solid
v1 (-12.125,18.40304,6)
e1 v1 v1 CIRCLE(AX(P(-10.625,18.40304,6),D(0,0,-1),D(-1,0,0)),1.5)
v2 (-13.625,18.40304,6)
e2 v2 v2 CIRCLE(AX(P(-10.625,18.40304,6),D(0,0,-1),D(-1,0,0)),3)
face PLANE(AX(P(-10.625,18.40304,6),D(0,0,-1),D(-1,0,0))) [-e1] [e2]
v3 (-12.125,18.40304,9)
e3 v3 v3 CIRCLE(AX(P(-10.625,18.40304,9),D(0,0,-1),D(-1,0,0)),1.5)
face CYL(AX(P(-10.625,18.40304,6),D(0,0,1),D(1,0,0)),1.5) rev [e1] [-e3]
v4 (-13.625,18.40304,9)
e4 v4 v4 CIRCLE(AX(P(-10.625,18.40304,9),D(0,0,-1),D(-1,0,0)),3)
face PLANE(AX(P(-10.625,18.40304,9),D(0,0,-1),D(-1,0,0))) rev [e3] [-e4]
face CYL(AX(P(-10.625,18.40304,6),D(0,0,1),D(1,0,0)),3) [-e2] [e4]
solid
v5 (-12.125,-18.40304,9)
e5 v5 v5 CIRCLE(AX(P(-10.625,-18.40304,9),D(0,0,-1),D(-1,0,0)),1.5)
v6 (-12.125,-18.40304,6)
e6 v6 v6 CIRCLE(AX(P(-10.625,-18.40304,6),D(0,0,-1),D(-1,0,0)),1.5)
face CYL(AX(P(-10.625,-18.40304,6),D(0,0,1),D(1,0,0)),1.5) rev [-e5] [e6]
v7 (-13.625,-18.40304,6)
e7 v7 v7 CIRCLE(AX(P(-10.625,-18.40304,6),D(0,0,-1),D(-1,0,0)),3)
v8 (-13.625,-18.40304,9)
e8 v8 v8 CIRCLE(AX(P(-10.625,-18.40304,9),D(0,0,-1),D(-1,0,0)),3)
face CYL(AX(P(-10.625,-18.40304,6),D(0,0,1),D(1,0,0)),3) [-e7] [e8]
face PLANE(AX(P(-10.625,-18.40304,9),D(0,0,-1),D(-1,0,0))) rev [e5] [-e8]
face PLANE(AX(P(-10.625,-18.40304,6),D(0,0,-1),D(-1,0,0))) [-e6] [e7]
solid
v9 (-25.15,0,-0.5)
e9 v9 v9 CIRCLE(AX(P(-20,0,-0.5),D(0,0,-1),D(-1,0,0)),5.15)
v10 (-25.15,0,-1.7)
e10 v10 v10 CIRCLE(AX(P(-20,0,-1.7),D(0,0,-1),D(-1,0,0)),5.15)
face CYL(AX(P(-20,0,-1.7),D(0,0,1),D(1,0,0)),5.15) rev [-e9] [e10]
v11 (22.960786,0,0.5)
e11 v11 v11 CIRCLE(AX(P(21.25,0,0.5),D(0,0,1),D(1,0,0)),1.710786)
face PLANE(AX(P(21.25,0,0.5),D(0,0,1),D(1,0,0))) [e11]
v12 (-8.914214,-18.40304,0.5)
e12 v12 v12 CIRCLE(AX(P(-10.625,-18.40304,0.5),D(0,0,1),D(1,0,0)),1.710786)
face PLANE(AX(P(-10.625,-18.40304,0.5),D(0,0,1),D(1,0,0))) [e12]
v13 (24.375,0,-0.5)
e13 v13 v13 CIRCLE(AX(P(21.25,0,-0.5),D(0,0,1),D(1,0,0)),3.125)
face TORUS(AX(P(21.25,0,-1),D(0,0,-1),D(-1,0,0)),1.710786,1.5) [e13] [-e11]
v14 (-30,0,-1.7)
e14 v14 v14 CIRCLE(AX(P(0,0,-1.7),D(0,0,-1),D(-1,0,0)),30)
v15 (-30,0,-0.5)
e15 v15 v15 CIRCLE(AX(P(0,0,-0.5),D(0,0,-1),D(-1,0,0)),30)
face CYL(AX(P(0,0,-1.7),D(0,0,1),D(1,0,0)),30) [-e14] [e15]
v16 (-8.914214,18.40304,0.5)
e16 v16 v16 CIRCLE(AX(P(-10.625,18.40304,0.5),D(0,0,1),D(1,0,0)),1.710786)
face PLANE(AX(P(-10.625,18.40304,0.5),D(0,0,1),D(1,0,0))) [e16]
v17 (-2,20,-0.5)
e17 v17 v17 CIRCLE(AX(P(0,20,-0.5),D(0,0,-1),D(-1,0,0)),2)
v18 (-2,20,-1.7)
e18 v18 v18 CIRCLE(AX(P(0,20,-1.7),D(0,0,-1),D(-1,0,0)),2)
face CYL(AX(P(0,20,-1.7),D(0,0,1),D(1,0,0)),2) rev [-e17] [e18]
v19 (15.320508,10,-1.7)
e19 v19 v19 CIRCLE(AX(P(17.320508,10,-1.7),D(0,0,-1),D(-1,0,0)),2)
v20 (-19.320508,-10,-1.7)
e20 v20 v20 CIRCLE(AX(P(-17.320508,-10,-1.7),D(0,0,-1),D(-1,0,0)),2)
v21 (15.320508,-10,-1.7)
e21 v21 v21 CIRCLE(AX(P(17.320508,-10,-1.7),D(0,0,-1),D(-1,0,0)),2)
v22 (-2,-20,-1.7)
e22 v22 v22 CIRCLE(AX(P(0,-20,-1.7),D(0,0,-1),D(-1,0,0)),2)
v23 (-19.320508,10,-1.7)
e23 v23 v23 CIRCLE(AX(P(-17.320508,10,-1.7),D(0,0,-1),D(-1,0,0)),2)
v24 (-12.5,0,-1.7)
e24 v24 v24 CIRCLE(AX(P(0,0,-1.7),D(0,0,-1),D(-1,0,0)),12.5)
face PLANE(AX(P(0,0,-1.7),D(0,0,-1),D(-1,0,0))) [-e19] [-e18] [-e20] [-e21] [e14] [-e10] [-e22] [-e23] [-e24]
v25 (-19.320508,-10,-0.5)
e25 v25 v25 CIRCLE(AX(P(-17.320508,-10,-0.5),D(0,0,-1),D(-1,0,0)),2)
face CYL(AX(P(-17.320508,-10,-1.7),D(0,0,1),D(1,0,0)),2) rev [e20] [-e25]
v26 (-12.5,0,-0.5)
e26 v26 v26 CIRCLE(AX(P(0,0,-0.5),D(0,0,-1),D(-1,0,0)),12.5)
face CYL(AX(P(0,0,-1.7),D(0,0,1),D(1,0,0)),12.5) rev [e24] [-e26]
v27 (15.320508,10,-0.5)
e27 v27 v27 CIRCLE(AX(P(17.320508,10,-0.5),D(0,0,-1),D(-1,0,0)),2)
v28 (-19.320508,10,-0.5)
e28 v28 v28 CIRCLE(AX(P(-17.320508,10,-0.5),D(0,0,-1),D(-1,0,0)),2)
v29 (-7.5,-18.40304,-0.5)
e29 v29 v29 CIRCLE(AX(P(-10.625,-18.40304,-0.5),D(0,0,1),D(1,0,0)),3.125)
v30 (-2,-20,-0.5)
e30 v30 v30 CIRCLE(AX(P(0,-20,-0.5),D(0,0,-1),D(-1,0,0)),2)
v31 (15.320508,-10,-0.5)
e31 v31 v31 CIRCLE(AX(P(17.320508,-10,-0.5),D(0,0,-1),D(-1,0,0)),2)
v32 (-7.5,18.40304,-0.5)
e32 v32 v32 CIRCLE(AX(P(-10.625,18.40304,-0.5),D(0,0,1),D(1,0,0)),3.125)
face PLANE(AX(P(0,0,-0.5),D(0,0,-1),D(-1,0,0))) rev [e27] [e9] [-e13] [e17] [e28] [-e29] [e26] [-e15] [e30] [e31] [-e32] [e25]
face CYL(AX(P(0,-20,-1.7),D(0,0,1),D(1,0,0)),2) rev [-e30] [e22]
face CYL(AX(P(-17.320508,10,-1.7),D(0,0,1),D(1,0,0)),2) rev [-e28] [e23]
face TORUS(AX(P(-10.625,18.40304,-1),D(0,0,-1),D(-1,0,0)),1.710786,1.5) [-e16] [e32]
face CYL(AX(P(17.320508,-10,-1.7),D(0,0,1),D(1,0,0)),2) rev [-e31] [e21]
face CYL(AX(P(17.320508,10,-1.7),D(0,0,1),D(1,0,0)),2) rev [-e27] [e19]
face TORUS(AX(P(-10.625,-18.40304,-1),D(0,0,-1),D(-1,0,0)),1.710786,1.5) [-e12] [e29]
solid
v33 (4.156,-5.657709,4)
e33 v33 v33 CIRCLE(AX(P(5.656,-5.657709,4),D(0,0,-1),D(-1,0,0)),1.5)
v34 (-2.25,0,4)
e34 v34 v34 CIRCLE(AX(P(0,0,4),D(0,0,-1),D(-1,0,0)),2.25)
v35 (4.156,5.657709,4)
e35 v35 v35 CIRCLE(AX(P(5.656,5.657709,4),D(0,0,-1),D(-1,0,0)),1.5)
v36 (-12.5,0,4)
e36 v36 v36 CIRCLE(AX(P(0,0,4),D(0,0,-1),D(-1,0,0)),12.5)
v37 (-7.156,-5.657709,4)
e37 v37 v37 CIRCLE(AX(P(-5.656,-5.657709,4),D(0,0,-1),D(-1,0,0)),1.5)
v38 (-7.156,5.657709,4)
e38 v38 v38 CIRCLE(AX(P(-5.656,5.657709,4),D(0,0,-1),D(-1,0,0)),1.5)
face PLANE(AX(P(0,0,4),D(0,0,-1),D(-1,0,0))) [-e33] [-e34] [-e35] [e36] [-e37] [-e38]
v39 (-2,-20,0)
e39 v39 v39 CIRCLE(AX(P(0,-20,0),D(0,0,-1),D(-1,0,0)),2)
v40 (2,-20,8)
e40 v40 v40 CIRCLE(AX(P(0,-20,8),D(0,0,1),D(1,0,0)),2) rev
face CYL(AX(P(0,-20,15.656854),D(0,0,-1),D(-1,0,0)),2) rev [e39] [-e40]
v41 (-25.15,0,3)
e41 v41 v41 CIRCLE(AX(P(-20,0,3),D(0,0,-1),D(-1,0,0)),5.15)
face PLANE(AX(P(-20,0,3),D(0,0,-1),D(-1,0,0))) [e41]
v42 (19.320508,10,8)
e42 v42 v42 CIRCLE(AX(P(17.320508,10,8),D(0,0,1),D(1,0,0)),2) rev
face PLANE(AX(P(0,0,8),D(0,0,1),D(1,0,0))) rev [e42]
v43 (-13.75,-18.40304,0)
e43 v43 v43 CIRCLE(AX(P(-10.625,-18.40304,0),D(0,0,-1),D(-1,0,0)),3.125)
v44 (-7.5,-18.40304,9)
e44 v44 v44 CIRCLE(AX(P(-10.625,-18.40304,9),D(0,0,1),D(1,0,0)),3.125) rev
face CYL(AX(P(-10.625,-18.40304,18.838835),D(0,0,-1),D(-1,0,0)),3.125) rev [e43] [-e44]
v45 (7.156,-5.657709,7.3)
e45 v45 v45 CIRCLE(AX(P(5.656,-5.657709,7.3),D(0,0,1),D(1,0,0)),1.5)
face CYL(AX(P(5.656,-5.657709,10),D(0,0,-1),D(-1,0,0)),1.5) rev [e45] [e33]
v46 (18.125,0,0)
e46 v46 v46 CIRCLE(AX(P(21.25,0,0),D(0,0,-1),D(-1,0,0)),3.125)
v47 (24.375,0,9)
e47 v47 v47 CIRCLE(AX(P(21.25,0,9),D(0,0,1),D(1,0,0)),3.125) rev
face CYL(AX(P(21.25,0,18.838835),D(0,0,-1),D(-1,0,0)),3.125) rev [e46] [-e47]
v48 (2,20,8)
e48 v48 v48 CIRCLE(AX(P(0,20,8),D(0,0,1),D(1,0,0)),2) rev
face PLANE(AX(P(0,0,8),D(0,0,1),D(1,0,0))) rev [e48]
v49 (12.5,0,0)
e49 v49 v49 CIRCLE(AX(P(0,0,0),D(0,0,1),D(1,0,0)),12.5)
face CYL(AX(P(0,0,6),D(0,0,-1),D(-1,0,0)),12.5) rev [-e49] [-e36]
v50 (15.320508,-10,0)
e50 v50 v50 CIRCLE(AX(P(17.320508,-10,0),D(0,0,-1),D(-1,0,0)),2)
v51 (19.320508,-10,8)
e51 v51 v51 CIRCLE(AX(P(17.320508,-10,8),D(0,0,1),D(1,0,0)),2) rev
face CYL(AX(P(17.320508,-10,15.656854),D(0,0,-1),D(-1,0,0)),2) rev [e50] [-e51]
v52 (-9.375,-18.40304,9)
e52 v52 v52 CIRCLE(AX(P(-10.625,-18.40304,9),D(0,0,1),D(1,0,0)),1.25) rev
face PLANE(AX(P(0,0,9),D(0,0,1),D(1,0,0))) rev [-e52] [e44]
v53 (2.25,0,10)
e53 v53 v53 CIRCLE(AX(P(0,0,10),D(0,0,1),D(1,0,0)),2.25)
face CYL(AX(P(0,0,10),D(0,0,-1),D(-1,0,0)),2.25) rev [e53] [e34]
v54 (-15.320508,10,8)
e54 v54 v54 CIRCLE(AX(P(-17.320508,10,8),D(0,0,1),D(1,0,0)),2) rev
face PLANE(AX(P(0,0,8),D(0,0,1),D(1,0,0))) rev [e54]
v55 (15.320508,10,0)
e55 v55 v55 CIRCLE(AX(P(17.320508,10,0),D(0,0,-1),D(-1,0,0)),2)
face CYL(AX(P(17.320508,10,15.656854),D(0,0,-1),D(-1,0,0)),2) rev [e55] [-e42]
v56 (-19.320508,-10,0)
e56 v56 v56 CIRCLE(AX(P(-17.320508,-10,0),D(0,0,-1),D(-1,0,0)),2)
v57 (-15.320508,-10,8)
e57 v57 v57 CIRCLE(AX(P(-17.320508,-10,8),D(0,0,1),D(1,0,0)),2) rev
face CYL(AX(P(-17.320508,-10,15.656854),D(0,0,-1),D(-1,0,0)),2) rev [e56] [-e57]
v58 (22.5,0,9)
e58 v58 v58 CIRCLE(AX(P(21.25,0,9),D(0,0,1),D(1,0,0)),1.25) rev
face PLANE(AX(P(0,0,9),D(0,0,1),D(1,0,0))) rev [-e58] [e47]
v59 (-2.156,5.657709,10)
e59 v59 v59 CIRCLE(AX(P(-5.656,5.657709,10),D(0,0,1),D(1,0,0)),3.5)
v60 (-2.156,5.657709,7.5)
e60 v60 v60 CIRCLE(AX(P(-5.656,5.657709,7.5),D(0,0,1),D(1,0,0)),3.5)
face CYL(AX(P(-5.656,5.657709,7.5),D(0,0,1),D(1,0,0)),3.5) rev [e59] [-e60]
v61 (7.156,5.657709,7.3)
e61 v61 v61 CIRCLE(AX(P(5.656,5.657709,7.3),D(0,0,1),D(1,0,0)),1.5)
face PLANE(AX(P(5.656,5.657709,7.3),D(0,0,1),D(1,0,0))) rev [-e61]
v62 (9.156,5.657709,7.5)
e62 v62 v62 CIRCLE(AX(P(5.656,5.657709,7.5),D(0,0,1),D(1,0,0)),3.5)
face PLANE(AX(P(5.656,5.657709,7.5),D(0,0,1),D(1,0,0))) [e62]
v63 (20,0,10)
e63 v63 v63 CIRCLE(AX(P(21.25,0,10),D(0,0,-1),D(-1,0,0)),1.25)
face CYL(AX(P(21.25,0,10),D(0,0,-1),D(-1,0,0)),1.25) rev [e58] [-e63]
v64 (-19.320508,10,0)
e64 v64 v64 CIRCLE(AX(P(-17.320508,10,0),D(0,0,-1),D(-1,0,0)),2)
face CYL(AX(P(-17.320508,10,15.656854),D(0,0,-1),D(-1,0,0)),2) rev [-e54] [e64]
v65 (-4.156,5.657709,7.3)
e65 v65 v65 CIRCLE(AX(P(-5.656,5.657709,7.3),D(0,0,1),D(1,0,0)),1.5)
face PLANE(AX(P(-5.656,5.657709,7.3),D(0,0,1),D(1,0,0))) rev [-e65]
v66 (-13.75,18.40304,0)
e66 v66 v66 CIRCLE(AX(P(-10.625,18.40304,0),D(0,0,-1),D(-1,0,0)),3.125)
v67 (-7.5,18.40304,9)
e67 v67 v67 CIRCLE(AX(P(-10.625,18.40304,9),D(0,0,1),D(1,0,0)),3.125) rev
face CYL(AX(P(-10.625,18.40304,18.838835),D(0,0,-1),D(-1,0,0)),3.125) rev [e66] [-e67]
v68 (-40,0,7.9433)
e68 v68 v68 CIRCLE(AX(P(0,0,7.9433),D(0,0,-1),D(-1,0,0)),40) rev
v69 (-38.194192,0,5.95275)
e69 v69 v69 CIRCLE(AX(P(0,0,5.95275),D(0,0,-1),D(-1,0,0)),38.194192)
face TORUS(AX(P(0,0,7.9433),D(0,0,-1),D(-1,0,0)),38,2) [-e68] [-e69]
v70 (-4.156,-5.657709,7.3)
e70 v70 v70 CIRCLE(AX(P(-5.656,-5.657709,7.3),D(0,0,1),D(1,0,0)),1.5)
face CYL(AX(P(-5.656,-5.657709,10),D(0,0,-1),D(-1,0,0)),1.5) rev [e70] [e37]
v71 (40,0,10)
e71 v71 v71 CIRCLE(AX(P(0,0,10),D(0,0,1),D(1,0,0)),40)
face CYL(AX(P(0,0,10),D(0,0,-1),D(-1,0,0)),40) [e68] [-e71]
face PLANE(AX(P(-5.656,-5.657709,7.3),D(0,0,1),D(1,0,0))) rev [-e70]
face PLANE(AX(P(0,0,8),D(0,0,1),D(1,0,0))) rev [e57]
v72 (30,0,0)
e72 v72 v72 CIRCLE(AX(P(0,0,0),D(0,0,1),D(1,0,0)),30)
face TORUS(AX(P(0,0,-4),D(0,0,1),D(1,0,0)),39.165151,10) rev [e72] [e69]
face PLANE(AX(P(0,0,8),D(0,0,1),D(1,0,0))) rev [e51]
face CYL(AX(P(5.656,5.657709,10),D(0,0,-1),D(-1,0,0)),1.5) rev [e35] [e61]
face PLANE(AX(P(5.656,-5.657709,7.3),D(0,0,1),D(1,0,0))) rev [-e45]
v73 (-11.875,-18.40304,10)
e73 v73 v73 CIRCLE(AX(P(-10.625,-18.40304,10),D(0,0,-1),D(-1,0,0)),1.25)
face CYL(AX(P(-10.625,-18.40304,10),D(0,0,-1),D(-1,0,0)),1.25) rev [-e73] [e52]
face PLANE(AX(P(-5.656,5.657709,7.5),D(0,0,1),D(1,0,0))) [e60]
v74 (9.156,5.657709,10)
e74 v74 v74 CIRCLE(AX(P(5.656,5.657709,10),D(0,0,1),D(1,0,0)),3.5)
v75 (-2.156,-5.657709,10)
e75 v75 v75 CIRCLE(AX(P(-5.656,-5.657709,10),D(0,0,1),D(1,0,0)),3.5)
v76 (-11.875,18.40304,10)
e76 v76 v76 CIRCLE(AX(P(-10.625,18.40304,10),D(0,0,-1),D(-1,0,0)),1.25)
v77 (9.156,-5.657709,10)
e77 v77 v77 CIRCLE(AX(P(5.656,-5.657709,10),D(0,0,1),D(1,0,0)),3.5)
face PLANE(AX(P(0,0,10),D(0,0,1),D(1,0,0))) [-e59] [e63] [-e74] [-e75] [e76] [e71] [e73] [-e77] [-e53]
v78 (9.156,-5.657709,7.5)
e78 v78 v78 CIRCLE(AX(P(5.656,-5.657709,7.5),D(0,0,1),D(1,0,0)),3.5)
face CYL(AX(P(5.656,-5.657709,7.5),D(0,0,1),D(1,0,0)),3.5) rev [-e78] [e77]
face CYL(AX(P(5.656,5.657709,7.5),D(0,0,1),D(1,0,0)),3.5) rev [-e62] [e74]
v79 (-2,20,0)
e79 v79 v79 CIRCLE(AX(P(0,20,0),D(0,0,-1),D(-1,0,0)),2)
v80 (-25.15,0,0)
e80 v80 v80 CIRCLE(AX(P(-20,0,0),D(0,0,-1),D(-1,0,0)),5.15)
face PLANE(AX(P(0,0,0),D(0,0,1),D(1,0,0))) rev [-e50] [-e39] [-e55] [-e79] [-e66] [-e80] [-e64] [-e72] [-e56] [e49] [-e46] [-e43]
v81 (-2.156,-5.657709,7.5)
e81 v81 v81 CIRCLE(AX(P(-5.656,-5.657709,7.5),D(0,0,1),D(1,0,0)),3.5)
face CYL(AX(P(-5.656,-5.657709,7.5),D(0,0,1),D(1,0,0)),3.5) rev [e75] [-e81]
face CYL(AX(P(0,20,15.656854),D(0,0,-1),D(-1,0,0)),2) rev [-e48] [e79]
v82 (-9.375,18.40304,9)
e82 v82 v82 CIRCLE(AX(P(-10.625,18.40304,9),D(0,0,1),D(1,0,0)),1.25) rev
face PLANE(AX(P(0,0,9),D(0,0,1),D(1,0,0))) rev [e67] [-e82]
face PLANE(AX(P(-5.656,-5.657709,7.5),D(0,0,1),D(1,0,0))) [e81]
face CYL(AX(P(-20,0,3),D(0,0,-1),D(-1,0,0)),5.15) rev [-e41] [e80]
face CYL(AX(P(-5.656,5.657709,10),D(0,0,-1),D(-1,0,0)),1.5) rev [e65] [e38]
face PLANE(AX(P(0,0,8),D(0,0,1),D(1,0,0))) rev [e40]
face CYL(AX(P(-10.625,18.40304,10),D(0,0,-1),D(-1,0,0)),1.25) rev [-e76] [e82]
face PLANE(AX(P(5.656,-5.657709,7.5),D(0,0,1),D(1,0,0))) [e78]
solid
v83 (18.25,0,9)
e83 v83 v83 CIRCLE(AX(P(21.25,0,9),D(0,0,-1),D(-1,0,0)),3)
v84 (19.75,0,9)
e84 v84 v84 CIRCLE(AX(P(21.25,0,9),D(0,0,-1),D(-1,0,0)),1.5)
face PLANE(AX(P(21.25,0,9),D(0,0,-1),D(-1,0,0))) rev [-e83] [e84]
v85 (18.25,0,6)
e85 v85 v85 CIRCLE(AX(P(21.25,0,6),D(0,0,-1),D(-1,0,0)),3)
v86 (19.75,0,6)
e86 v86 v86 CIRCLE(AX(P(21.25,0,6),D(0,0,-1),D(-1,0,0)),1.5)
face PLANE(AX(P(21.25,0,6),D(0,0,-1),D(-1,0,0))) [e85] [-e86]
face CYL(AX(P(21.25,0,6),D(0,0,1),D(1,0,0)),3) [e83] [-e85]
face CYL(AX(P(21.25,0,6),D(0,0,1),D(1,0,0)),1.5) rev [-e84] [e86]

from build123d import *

# Parameters (mm, degrees)
SKETCH1_R             = 30
SKETCH1_R_2           = 12.5
BOSS_EXTRUDE1_DEPTH   = 6
SKETCH2_R             = 40
SKETCH2_R_2           = 2.25
SKETCH2_R_3           = 1.5
BOSS_EXTRUDE2_DEPTH   = 4
SKETCH3_R             = 3.5
CUT_EXTRUDE1_DEPTH    = 2.5
SKETCH4_R             = 5.15
CUT_EXTRUDE2_DEPTH    = 3
SKETCH5_R             = 3.5
BOSS_EXTRUDE3_DEPTH   = 0.2
SKETCH6_R             = 1.25
CUT_EXTRUDE3_DEPTH    = 10
SKETCH7_R             = 3.125
CUT_EXTRUDE4_DEPTH    = 9
SKETCH8_R             = 2
CUT_EXTRUDE5_DEPTH    = 8
SKETCH9_R             = 3
BOSS_EXTRUDE4_DEPTH   = 0.5
BOSS_EXTRUDE4_2_DEPTH = 0.5
BOSS_EXTRUDE4_3_DEPTH = 0.5
SKETCH11_R            = 3
SKETCH11_R_2          = 1.5
BOSS_EXTRUDE6_DEPTH   = 3
BOSS_EXTRUDE6_2_DEPTH = 3
BOSS_EXTRUDE6_3_DEPTH = 3
SKETCH10_R            = 30
SKETCH10_R_2          = 12.5
SKETCH10_R_3          = 5.15
SKETCH10_R_4          = 2
SKETCH10_R_5          = 3
BOSS_EXTRUDE7_DEPTH   = 1.2
FILLET1_R             = 10
FILLET2_R             = 2
BOSS_EXTRUDE8_START   = 2
SKETCH12_R            = 12.5
SKETCH12_R_2          = 2.25
SKETCH12_R_3          = 1.5
BOSS_EXTRUDE8_DEPTH   = 2
SKETCH13_R            = 3.125
BOSS_EXTRUDE9_DEPTH   = 1
FILLET3_R             = 1.5


with BuildPart() as part:
    # Sketch1 → Boss-Extrude1 (new body)
    with BuildSketch(Plane.XY):
        Circle(SKETCH1_R)
        Circle(SKETCH1_R_2, mode=Mode.SUBTRACT)
    extrude(amount=BOSS_EXTRUDE1_DEPTH)

    # Sketch2 → Boss-Extrude2 (add)
    with BuildSketch(Plane.XY.offset(6)):
        Circle(SKETCH2_R)
        Circle(SKETCH2_R_2, mode=Mode.SUBTRACT)
        with Locations((-5.655999742, 5.657708628)):
            Circle(SKETCH2_R_3, mode=Mode.SUBTRACT)
        with Locations((-5.655999742, -5.657708628)):
            Circle(SKETCH2_R_3, mode=Mode.SUBTRACT)
        with Locations((5.655999742, -5.657708628)):
            Circle(SKETCH2_R_3, mode=Mode.SUBTRACT)
        with Locations((5.655999742, 5.657708628)):
            Circle(SKETCH2_R_3, mode=Mode.SUBTRACT)
    extrude(amount=BOSS_EXTRUDE2_DEPTH)

    # Sketch3 → Cut-Extrude1 (cut)
    with BuildSketch(Plane.XY.offset(10)):
        with Locations((-5.655999742, 5.657708628)):
            Circle(SKETCH3_R)
        with Locations((5.655999742, 5.657708628)):
            Circle(SKETCH3_R)
        with Locations((5.655999742, -5.657708628)):
            Circle(SKETCH3_R)
        with Locations((-5.655999742, -5.657708628)):
            Circle(SKETCH3_R)
    extrude(amount=-CUT_EXTRUDE1_DEPTH, mode=Mode.SUBTRACT)

    # Sketch4 → Cut-Extrude2 (cut)
    with BuildSketch(Plane(origin=(0, 0, 0), x_dir=(-1, 0, 0), z_dir=(0, 0, -1))):
        with Locations((20, 0)):
            Circle(SKETCH4_R)
    extrude(amount=-CUT_EXTRUDE2_DEPTH, mode=Mode.SUBTRACT)

    # Sketch5 → Boss-Extrude3 (add)
    with BuildSketch(Plane.XY.offset(7.5)):
        with Locations((-5.655999742, 5.657708628)):
            Circle(SKETCH5_R)
        with Locations((5.655999742, 5.657708628)):
            Circle(SKETCH5_R)
        with Locations((-5.655999742, -5.657708628)):
            Circle(SKETCH5_R)
        with Locations((5.655999742, -5.657708628)):
            Circle(SKETCH5_R)
    extrude(amount=-BOSS_EXTRUDE3_DEPTH)

    # Sketch6 → Cut-Extrude3 (cut)
    with BuildSketch(Plane(origin=(0, 0, 0), x_dir=(-1, 0, 0), z_dir=(0, 0, -1))):
        with Locations((-21.25, 0)):
            Circle(SKETCH6_R)
        with Locations((10.625, 18.40303983)):
            Circle(SKETCH6_R)
        with Locations((10.625, -18.40303983)):
            Circle(SKETCH6_R)
    extrude(amount=-CUT_EXTRUDE3_DEPTH, mode=Mode.SUBTRACT)

    # Sketch7 → Cut-Extrude4 (cut)
    with BuildSketch(Plane(origin=(0, 0, 0), x_dir=(-1, 0, 0), z_dir=(0, 0, -1))):
        with Locations((-21.25, 0)):
            Circle(SKETCH7_R)
        with Locations((10.625, 18.40303983)):
            Circle(SKETCH7_R)
        with Locations((10.625, -18.40303983)):
            Circle(SKETCH7_R)
    extrude(amount=-CUT_EXTRUDE4_DEPTH, mode=Mode.SUBTRACT)

    # Sketch8 → Cut-Extrude5 (cut)
    with BuildSketch(Plane(origin=(0, 0, 0), x_dir=(-1, 0, 0), z_dir=(0, 0, -1))):
        with Locations((17.320508076, -10)):
            Circle(SKETCH8_R)
        with Locations((0, -20)):
            Circle(SKETCH8_R)
        with Locations((-17.320508076, -10)):
            Circle(SKETCH8_R)
        with Locations((-17.320508076, 10)):
            Circle(SKETCH8_R)
        with Locations((0, 20)):
            Circle(SKETCH8_R)
        with Locations((17.320508076, 10)):
            Circle(SKETCH8_R)
    extrude(amount=-CUT_EXTRUDE5_DEPTH, mode=Mode.SUBTRACT)

    # Fillet1
    # the kernel refuses this fillet: 10 mm, written as the material it adds along each edge
    with BuildSketch(Plane(origin=(0, 0, 6), x_dir=(1, 0, 0), z_dir=(0, -1, 0))) as fillet1_piece_1:
        with BuildLine():
            CenterArc((39.16515139, -10), FILLET1_R, 90, 66.421821522)
            Line((30, -6), (29.816696972, -5.92))
            ThreePointArc((29.816696972, -5.92), (29.8, -3), (29.8, 0))
            Line((29.8, 0), (30, 0.2))
            Line((30, 0.2), (39.16515139, 0.2))
            Line((39.16515139, 0.2), (39.16515139, 0))
        make_face()
    revolve(axis=Axis((0, 0, 6), (0, 0, 1)))

    # Fillet2
    fillet2_edges = [part.edges().sort_by_distance(p)[0] for p in [
        (-40, 0, 6),
    ]]
    fillet(fillet2_edges, radius=FILLET2_R)

    # Sketch12 → Boss-Extrude8 (add)
    with BuildSketch(Plane(origin=(0, 0, 6), x_dir=(-1, 0, 0), z_dir=(0, 0, -1)).offset(BOSS_EXTRUDE8_START)):
        Circle(SKETCH12_R)
        Circle(SKETCH12_R_2, mode=Mode.SUBTRACT)
        with Locations((-5.655999742, 5.657708628)):
            Circle(SKETCH12_R_3, mode=Mode.SUBTRACT)
        with Locations((5.655999742, 5.657708628)):
            Circle(SKETCH12_R_3, mode=Mode.SUBTRACT)
        with Locations((5.655999742, -5.657708628)):
            Circle(SKETCH12_R_3, mode=Mode.SUBTRACT)
        with Locations((-5.655999742, -5.657708628)):
            Circle(SKETCH12_R_3, mode=Mode.SUBTRACT)
    extrude(amount=-BOSS_EXTRUDE8_DEPTH)


with BuildPart() as body_2:
    # Sketch9 → Boss-Extrude4 (new body)
    with BuildSketch(Plane(origin=(0, 0, 0), x_dir=(-1, 0, 0), z_dir=(0, 0, -1))):
        with Locations((-21.25, 0)):
            Circle(SKETCH9_R)
    extrude(amount=BOSS_EXTRUDE4_DEPTH)


with BuildPart() as body_3:
    # Sketch9 → Boss-Extrude4 2 (new body)
    with BuildSketch(Plane(origin=(0, 0, 0), x_dir=(-1, 0, 0), z_dir=(0, 0, -1))):
        with Locations((10.625, 18.40303983)):
            Circle(SKETCH9_R)
    extrude(amount=BOSS_EXTRUDE4_2_DEPTH)


with BuildPart() as body_4:
    # Sketch9 → Boss-Extrude4 3 (new body)
    with BuildSketch(Plane(origin=(0, 0, 0), x_dir=(-1, 0, 0), z_dir=(0, 0, -1))):
        with Locations((10.625, -18.40303983)):
            Circle(SKETCH9_R)
    extrude(amount=BOSS_EXTRUDE4_3_DEPTH)


with BuildPart() as body_5:
    # Sketch11 → Boss-Extrude6 (new body)
    with BuildSketch(Plane(origin=(0, 0, 9), x_dir=(-1, 0, 0), z_dir=(0, 0, -1))):
        with Locations((-21.25, 0)):
            Circle(SKETCH11_R)
        with Locations((-21.25, 0)):
            Circle(SKETCH11_R_2, mode=Mode.SUBTRACT)
    extrude(amount=BOSS_EXTRUDE6_DEPTH)


with BuildPart() as body_6:
    # Sketch11 → Boss-Extrude6 2 (new body)
    with BuildSketch(Plane(origin=(0, 0, 9), x_dir=(-1, 0, 0), z_dir=(0, 0, -1))):
        with Locations((10.625, 18.40303983)):
            Circle(SKETCH11_R)
        with Locations((10.625, 18.40303983)):
            Circle(SKETCH11_R_2, mode=Mode.SUBTRACT)
    extrude(amount=BOSS_EXTRUDE6_2_DEPTH)


with BuildPart() as body_7:
    # Sketch11 → Boss-Extrude6 3 (new body)
    with BuildSketch(Plane(origin=(0, 0, 9), x_dir=(-1, 0, 0), z_dir=(0, 0, -1))):
        with Locations((10.625, -18.40303983)):
            Circle(SKETCH11_R)
        with Locations((10.625, -18.40303983)):
            Circle(SKETCH11_R_2, mode=Mode.SUBTRACT)
    extrude(amount=BOSS_EXTRUDE6_3_DEPTH)


with BuildPart() as body_8:
    # Sketch10 → Boss-Extrude7 (new body)
    # profile 1 of 2: a face of its own
    with BuildSketch(Plane(origin=(0, 0, -0.5), x_dir=(-1, 0, 0), z_dir=(0, 0, -1))):
        Circle(SKETCH10_R)
        Circle(SKETCH10_R_2, mode=Mode.SUBTRACT)
        with Locations((20, 0)):
            Circle(SKETCH10_R_3, mode=Mode.SUBTRACT)
        with Locations((-17.320508076, 10)):
            Circle(SKETCH10_R_4, mode=Mode.SUBTRACT)
        with Locations((0, 20)):
            Circle(SKETCH10_R_4, mode=Mode.SUBTRACT)
        with Locations((17.320508076, 10)):
            Circle(SKETCH10_R_4, mode=Mode.SUBTRACT)
        with Locations((17.320508076, -10)):
            Circle(SKETCH10_R_4, mode=Mode.SUBTRACT)
        with Locations((0, -20)):
            Circle(SKETCH10_R_4, mode=Mode.SUBTRACT)
        with Locations((-17.320508076, -10)):
            Circle(SKETCH10_R_4, mode=Mode.SUBTRACT)
        with Locations((10.625, 18.40303983)):
            Circle(SKETCH10_R_5, mode=Mode.SUBTRACT)
    # profile 2 of 2: a face of its own
    with BuildSketch(Plane(origin=(0, 0, -0.5), x_dir=(-1, 0, 0), z_dir=(0, 0, -1))):
        with Locations((10.625, 18.40303983)):
            Circle(SKETCH10_R_5)
    extrude(amount=BOSS_EXTRUDE7_DEPTH)

    # Sketch13 → Boss-Extrude9 (add)
    with BuildSketch(Plane.XY.offset(-0.5)):
        with Locations((21.25, 0)):
            Circle(SKETCH13_R)
        with Locations((-10.625, 18.40303983)):
            Circle(SKETCH13_R)
        with Locations((-10.625, -18.40303983)):
            Circle(SKETCH13_R)
    extrude(amount=BOSS_EXTRUDE9_DEPTH)

    # Fillet3
    # the kernel refuses this fillet: 1.5 mm, written as the material it takes off along each edge
    with BuildSketch(Plane(origin=(21.25, 0, 0.5), x_dir=(1, 0, 0), z_dir=(0, -1, 0))) as fillet3_piece_1:
        with BuildLine():
            CenterArc((1.710786438, -1.5), FILLET3_R, 19.471220634, 70.528779366)
            Line((1.710786438, 0), (1.710786438, 0.03))
            Line((1.710786438, 0.03), (3.125, 0.03))
            Line((3.125, 0.03), (3.155, 0))
            ThreePointArc((3.155, 0), (3.155, -0.5), (3.153284271, -0.99))
            Line((3.153284271, -0.99), (3.125, -1))
        make_face()
    revolve(axis=Axis((21.25, 0, 0.5), (0, 0, 1)), mode=Mode.SUBTRACT)
    with BuildSketch(Plane(origin=(-10.625, 18.40303983, 0.5), x_dir=(1, 0, 0), z_dir=(0, -1, 0))) as fillet3_piece_2:
        with BuildLine():
            CenterArc((1.710786438, -1.5), FILLET3_R, 19.471220634, 70.528779366)
            Line((1.710786438, 0), (1.710786438, 0.03))
            Line((1.710786438, 0.03), (3.125, 0.03))
            Line((3.125, 0.03), (3.155, 0))
            ThreePointArc((3.155, 0), (3.155, -0.5), (3.153284271, -0.99))
            Line((3.153284271, -0.99), (3.125, -1))
        make_face()
    revolve(axis=Axis((-10.625, 18.40303983, 0.5), (0, 0, 1)), mode=Mode.SUBTRACT)
    with BuildSketch(Plane(origin=(-10.625, -18.40303983, 0.5), x_dir=(1, 0, 0), z_dir=(0, -1, 0))) as fillet3_piece_3:
        with BuildLine():
            CenterArc((1.710786438, -1.5), FILLET3_R, 19.471220634, 70.528779366)
            Line((1.710786438, 0), (1.710786438, 0.03))
            Line((1.710786438, 0.03), (3.125, 0.03))
            Line((3.125, 0.03), (3.155, 0))
            ThreePointArc((3.155, 0), (3.155, -0.5), (3.153284271, -0.99))
            Line((3.153284271, -0.99), (3.125, -1))
        make_face()
    revolve(axis=Axis((-10.625, -18.40303983, 0.5), (0, 0, 1)), mode=Mode.SUBTRACT)


solid = Compound([part.part, body_5.part, body_6.part, body_7.part, body_8.part])
